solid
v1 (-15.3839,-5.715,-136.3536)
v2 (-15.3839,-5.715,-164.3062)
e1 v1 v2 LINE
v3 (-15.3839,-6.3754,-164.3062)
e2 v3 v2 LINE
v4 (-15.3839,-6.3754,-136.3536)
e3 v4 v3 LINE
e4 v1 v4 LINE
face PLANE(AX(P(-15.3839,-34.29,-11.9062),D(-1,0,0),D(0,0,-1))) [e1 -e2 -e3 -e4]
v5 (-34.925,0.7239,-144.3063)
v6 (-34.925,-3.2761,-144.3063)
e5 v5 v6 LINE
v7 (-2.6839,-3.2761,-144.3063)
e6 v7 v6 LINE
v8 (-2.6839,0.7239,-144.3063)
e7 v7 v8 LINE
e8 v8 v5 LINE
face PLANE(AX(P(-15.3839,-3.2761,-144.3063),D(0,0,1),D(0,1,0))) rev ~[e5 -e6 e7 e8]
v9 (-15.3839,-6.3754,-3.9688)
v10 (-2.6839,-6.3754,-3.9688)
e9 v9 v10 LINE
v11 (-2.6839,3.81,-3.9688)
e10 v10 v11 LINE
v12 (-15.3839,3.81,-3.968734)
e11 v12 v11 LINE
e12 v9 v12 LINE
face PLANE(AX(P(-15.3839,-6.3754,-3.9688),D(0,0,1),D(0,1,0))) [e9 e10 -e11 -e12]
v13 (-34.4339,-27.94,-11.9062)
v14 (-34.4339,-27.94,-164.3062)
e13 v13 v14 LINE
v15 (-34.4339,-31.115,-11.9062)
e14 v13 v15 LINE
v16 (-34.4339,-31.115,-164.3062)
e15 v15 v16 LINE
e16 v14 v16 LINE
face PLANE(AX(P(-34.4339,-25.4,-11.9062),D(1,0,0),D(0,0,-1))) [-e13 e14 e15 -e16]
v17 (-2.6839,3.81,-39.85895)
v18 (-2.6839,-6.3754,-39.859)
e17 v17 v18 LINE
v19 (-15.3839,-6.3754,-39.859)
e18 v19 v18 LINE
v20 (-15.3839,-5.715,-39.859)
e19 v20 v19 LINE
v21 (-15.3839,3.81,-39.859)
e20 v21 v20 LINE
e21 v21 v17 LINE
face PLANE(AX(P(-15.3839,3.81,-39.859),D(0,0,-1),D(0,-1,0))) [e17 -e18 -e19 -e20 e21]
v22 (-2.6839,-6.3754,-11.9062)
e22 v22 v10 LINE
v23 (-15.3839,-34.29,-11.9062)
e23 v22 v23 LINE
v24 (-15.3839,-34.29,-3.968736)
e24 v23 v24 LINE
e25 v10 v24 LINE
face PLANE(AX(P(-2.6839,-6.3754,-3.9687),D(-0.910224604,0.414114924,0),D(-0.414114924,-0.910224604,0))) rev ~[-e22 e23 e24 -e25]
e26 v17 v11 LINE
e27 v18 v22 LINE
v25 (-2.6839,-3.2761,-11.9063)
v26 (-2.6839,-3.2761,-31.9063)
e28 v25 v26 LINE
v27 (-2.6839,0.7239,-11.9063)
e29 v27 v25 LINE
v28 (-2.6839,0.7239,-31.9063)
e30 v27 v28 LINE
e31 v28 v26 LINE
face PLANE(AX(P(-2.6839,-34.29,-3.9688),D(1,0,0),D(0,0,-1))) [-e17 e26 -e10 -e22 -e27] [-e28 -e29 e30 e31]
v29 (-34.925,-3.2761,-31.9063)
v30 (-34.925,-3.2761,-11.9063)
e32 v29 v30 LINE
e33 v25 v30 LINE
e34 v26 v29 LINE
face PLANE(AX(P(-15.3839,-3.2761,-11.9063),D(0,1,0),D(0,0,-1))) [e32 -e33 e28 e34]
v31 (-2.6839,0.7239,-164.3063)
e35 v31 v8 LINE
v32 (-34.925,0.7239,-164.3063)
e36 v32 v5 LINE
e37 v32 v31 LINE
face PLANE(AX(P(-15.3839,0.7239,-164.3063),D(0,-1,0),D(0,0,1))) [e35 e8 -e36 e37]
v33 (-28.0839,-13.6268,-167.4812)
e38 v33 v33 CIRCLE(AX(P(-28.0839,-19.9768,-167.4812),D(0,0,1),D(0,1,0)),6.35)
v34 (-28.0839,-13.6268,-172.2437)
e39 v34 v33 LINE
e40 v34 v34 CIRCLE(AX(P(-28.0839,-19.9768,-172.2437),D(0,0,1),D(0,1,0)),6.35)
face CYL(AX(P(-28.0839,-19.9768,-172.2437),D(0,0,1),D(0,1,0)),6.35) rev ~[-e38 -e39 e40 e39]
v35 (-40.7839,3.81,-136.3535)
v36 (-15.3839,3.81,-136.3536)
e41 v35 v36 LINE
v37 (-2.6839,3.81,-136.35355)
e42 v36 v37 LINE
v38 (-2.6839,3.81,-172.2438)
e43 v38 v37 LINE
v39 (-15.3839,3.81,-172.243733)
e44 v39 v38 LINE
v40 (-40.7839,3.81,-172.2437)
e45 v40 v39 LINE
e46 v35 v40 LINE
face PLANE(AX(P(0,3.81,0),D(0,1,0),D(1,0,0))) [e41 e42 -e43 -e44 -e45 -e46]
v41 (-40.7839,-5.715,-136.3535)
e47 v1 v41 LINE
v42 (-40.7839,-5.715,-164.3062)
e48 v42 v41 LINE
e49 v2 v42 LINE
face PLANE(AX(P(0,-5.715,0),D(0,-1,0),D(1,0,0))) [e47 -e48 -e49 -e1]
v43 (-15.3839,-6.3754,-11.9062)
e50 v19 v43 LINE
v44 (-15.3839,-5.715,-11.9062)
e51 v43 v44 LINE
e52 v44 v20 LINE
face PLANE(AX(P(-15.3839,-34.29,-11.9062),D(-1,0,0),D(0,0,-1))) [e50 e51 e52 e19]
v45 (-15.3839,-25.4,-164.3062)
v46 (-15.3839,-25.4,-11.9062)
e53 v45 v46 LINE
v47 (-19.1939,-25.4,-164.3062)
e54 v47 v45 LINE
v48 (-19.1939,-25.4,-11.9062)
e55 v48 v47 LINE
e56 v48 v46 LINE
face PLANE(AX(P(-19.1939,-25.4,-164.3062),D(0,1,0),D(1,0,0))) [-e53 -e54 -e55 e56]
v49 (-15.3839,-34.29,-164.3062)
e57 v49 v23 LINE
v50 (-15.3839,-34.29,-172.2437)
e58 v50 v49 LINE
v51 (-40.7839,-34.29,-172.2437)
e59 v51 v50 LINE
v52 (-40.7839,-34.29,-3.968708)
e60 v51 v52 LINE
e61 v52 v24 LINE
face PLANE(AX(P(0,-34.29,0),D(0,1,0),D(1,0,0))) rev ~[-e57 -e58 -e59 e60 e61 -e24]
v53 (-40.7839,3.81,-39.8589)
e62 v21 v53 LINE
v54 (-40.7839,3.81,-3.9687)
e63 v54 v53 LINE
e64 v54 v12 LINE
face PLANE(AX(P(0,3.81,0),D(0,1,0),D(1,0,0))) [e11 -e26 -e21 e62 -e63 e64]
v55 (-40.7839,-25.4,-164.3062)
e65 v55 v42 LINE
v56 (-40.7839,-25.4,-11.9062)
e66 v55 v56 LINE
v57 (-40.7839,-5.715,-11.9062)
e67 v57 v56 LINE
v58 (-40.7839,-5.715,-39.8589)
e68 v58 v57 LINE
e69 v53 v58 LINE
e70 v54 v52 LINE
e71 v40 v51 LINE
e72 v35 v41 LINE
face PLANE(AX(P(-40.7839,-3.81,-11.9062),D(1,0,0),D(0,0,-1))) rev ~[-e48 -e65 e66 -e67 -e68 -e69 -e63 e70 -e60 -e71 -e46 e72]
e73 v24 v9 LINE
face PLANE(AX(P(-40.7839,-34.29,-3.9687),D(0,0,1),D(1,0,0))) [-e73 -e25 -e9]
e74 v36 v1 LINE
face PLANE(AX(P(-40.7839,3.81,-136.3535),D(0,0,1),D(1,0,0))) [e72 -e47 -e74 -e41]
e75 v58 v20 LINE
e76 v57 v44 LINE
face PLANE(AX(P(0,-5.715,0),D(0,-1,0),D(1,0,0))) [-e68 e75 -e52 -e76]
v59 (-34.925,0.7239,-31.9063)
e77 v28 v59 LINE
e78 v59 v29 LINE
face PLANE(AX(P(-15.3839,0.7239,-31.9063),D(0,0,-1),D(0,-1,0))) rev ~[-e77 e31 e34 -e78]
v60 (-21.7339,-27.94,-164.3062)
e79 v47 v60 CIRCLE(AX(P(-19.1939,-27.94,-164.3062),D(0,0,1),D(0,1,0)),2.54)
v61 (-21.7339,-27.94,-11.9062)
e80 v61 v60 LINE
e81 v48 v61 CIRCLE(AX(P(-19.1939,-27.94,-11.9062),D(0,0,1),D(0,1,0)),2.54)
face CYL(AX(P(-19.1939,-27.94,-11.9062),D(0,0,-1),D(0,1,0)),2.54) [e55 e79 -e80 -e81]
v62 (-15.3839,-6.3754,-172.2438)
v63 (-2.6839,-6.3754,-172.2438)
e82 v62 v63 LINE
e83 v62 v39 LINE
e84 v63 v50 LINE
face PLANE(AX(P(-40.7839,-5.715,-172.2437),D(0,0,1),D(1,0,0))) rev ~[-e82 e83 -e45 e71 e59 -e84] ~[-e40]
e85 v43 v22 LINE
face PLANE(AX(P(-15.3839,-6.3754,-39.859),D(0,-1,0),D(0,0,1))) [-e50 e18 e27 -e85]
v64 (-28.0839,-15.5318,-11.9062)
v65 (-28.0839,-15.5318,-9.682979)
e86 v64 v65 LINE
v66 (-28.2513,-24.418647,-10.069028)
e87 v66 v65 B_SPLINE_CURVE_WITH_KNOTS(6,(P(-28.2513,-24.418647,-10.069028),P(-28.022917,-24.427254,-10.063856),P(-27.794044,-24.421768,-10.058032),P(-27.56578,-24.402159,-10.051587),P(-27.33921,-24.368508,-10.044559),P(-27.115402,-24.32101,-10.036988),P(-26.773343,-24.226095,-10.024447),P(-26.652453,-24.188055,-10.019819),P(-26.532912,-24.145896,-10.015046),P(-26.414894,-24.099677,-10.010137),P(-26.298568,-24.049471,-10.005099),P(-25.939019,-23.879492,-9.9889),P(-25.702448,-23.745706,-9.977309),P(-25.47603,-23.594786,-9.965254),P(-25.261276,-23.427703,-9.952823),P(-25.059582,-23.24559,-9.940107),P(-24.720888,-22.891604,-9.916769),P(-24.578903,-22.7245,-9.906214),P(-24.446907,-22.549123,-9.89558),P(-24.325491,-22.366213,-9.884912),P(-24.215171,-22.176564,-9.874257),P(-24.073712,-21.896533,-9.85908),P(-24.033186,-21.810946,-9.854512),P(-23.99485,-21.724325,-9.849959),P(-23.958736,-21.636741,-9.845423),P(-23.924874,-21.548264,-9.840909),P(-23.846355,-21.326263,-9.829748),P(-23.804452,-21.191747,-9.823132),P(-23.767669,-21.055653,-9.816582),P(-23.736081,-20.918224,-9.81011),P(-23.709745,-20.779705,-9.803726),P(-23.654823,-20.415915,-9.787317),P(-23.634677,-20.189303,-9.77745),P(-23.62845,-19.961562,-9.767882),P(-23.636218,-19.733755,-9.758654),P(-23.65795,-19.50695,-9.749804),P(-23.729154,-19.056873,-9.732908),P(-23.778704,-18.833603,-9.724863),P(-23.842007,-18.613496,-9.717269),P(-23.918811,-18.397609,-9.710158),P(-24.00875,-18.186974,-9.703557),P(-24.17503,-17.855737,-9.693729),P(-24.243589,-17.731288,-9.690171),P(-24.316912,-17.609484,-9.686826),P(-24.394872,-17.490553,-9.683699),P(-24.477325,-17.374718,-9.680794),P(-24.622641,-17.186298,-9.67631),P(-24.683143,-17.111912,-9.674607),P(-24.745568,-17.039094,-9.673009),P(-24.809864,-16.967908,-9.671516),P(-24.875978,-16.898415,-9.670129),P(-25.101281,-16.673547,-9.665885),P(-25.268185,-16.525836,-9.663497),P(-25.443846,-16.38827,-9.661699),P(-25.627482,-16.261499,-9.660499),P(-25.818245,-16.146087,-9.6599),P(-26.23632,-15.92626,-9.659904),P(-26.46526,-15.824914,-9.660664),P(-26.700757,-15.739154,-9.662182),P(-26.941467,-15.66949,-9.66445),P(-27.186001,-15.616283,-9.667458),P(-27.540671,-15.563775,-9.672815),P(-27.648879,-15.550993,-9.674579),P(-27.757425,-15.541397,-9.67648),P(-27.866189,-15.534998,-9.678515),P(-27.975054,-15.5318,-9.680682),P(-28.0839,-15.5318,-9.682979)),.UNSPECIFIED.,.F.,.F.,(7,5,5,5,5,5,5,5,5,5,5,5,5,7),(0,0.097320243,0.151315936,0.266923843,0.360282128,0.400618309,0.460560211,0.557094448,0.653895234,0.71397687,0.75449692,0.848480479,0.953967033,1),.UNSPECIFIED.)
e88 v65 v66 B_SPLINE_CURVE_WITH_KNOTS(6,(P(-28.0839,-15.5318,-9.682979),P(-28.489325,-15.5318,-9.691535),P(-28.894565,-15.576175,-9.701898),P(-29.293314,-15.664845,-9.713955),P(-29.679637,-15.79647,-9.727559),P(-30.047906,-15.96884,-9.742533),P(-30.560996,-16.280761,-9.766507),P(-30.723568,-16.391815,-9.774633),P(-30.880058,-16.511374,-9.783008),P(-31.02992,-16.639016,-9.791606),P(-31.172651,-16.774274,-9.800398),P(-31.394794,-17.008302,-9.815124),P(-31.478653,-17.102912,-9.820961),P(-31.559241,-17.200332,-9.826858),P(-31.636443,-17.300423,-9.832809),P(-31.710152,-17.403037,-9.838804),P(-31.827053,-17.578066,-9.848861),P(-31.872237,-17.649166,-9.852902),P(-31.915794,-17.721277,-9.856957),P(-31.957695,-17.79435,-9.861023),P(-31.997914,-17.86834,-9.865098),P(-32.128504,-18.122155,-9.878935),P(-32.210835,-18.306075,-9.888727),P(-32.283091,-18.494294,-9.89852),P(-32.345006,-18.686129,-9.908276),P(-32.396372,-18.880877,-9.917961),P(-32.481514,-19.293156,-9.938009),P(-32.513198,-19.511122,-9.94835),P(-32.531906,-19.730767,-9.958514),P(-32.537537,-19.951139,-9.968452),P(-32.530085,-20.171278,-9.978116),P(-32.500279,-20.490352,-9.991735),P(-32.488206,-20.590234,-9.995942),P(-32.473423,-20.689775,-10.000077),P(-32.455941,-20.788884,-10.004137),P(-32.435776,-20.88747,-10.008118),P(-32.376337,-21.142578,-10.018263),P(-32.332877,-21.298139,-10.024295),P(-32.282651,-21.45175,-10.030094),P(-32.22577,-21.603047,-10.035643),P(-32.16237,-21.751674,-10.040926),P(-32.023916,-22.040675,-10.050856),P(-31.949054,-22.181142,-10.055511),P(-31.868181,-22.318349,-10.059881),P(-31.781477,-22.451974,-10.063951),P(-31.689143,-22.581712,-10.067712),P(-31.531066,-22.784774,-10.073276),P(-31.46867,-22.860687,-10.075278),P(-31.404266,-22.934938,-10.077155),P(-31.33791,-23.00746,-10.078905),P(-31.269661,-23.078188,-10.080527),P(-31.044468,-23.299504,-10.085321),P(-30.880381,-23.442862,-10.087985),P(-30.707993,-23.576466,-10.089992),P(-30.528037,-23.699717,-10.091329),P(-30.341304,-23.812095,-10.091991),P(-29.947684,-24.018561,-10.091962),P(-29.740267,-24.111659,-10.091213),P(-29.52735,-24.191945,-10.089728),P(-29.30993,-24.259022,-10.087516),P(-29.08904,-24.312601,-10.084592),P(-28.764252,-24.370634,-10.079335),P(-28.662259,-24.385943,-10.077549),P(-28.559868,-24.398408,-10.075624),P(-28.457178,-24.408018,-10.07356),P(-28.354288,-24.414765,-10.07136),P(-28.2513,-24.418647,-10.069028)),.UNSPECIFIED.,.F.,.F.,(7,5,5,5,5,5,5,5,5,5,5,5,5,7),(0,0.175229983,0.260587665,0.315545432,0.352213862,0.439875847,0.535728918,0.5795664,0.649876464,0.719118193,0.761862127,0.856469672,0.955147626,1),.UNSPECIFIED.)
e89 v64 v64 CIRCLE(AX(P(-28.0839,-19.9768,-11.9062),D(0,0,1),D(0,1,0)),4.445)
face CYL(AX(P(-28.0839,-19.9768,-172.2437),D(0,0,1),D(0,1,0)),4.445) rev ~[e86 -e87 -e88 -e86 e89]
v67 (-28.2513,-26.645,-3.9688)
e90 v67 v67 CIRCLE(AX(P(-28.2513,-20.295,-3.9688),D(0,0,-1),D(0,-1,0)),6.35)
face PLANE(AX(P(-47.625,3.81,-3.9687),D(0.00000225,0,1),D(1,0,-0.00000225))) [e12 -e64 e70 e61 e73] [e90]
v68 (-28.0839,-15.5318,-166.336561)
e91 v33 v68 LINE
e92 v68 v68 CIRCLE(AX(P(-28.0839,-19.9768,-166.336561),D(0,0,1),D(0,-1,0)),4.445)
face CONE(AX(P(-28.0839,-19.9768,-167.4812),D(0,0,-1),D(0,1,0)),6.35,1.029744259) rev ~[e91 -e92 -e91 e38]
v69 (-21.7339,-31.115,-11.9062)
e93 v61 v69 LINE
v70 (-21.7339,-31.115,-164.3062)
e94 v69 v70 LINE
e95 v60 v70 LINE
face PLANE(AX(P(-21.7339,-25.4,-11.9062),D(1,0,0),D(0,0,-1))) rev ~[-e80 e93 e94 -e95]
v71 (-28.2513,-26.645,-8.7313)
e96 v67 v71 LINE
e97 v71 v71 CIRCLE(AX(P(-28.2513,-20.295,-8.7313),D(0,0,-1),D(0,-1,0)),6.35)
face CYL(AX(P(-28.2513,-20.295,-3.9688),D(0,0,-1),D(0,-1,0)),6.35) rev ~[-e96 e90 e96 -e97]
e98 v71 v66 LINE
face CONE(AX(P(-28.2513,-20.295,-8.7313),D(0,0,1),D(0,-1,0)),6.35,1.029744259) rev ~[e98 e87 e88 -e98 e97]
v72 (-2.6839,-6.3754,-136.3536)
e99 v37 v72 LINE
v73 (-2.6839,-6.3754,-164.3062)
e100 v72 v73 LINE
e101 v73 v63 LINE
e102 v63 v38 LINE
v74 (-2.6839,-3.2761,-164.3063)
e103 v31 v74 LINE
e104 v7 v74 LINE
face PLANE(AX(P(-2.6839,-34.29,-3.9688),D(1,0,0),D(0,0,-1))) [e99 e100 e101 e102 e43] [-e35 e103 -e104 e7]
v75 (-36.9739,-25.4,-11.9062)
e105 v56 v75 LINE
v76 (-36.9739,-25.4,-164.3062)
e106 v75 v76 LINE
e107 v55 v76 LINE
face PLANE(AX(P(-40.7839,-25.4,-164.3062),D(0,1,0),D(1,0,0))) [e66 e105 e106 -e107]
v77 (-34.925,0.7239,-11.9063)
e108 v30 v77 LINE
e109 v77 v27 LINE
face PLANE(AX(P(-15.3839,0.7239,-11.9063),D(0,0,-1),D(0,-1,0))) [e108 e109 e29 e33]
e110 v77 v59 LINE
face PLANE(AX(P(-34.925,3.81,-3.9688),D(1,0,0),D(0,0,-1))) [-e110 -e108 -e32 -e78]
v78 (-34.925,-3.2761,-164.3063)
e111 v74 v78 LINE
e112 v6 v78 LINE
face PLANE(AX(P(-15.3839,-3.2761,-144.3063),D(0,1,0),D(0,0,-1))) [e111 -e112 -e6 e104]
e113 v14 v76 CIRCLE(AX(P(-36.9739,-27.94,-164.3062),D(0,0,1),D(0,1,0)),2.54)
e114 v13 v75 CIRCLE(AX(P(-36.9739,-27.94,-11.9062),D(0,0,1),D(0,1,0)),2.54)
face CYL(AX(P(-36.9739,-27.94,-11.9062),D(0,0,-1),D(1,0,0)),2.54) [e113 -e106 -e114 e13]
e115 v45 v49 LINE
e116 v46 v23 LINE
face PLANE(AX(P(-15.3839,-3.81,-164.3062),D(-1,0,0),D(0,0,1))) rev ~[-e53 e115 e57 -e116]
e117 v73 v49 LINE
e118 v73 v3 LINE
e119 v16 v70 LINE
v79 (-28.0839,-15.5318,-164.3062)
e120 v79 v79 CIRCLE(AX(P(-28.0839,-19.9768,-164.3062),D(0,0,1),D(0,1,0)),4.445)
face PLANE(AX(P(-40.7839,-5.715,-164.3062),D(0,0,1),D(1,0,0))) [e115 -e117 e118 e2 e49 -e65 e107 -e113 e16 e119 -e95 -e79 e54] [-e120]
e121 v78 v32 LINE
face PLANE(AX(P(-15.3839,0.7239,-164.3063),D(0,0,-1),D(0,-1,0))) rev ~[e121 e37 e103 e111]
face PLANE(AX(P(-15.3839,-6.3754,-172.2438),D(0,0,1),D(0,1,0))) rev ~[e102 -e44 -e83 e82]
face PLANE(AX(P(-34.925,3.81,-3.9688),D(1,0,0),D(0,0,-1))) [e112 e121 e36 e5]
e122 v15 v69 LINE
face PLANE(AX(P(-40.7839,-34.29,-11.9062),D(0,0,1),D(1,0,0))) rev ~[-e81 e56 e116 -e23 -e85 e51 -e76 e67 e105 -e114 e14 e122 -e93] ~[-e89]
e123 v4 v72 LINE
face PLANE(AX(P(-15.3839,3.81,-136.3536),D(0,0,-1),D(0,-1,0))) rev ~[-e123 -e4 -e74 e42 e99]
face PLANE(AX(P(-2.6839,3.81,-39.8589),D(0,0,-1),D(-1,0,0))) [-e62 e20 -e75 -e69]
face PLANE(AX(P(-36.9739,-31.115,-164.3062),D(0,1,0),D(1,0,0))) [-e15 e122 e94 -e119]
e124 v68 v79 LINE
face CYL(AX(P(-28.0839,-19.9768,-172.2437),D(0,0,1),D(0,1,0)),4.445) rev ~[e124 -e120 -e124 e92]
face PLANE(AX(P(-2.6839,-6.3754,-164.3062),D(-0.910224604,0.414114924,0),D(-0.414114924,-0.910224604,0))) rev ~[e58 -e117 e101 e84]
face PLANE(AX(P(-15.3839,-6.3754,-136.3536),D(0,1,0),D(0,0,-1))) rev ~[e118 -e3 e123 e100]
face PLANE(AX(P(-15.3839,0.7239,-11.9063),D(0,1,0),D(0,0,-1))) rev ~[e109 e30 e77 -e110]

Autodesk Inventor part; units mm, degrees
ref_plane "YZ Plane" through (0, 0, 0) normal (1, 0, 0) x (0, 1, 0)
ref_plane "XZ Plane" through (0, 0, 0) normal (0, 1, 0) x (-1, 0, 0)
ref_plane "XY Plane" through (0, 0, 0) normal (0, 0, 1) x (1, 0, 0)
sketch "Sketch1" plane through (0, 0, 0) normal (0, 1, 0) x (-1, 0, 0)
  line L0 (41.275, -164.3062) -> (9.525, -164.3062)
  line L1 (9.525, -164.3062) -> (9.525, -11.9062)
  line L2 (9.525, -11.9062) -> (41.275, -11.9062)
  line L3 (41.275, -11.9062) -> (41.275, -164.3062)
  line L4 (41.275, -164.3062) -> (9.525, -164.3062)
  line L5 (9.525, -164.3062) -> (9.525, -146.7428)
  line L6 (9.525, -146.7428) -> (41.275, -146.7428)
  line L7 (41.275, -146.7428) -> (41.275, -164.3062)
  point P0 (0, 0)
  dimension "d37" = 31.75
  dimension "d50" = 152.4
sketch "Sketch2" plane through (0, 0, 0) normal (1, 0, 0) x (0, 1, 0)
  point P0 (0, 0)
extrude "Extrusion1" add sketch "Sketch1" along normal mid plane 7.62
sketch "Sketch3" plane through (0, 3.81, 0) normal (0, 1, 0) x (1, 0, 0)
  point P0 (0, 0)
sketch "Sketch4" plane through (0, 3.81, 0) normal (0, 1, 0) x (1, 0, 0)
  line L0 (-47.625, 3.9687) -> (-47.625, 172.2437)
  line L1 (-47.625, 172.2437) -> (-3.175, 172.2437)
  line L2 (-3.175, 172.2437) -> (-3.175, 3.9688)
  line L3 (-41.275, 164.3062) -> (-9.525, 164.3062) projected
  line L4 (-41.275, 11.9062) -> (-41.275, 164.3062) projected
  line L5 (-9.525, 164.3062) -> (-41.275, 164.3062) projected
  line L6 (-41.275, 11.9062) -> (-9.525, 11.9062) projected
  line L7 (-41.275, 164.3062) -> (-9.525, 164.3062)
  line L8 (-9.525, 164.3062) -> (-9.525, 11.9062)
  line L9 (-9.525, 11.9062) -> (-41.275, 11.9062)
  line L10 (-41.275, 11.9062) -> (-41.275, 164.3062)
  line L11 (-47.625, 3.9687) -> (-3.175, 3.9688)
  dimension "d38" = 7.9375
  dimension "d40" = 7.9375
  dimension "d41" = 6.35
  dimension "d42" = 6.35
extrude "Extrusion2" add sketch "Sketch4" against normal blind 38.1
fillet "Fillet1" radius 3.175 3 edges at (-47.625, -34.29, -88.1062) (-47.625, -15.24, -3.9687) (-47.625, -15.24, -172.2437)
sketch "Sketch6" plane through (-3.175, 3.81, -3.9688) normal (1, 0, 0) x (0, 0, -1)
  line L0 (140.3375, -7.0861) -> (160.3375, -7.0861)
  line L1 (160.3375, -7.0861) -> (160.3375, -3.0861)
  line L2 (160.3375, -3.0861) -> (140.3375, -3.0861)
  line L3 (140.3375, -3.0861) -> (140.3375, -7.0861)
  line L4 (27.3343, -7.0861) -> (7.3343, -7.0861)
  line L5 (7.3343, -7.0861) -> (7.3343, -3.0861)
  line L6 (7.3343, -3.0861) -> (27.3343, -3.0861)
  line L7 (27.3343, -3.0861) -> (27.3343, -7.0861)
  line L8 (85.181, -7.0861) -> (65.181, -7.0861)
  line L9 (65.181, -7.0861) -> (65.181, -3.0861)
  line L10 (65.181, -3.0861) -> (85.181, -3.0861)
  line L11 (85.181, -3.0861) -> (85.181, -7.0861)
  line L12 (0, 0) -> (168.275, 0) projected
  point P0 (-3.9688, -3.81)
  point P1 (160.3375, -38.1)
  dimension "d20" = 4
  dimension "d21" = 20
  dimension "d22" = 0
  dimension "d23" = 3.0861
  dimension "d24" = 3.0861
extrude "Extrusion3" cut sketch "Sketch6" against normal blind 31.75 contours L3 L2 L1 L0
sketch "Sketch7" plane through (-3.175, 3.81, -3.9688) normal (1, 0, 0) x (0, 0, -1)
  line L0 (27.9375, -7.0861) -> (7.9375, -7.0861)
  line L1 (7.9375, -7.0861) -> (7.9375, -3.0861)
  line L2 (7.9375, -3.0861) -> (27.9375, -3.0861)
  line L3 (27.9375, -3.0861) -> (27.9375, -7.0861)
  line L4 (160.3375, -7.0861) -> (140.3375, -7.0861) projected
  line L5 (140.3375, -7.0861) -> (140.3375, -3.0861) projected
  line L6 (0, 0) -> (168.275, 0) projected
  line L7 (140.3375, -3.0861) -> (160.3375, -3.0861) projected
  point P0 (-3.9688, -3.81)
  point P1 (7.9375, -38.1)
  dimension "d28" = 0
  dimension "d31" = 3.0861
extrude "Extrusion4" cut sketch "Sketch7" against normal blind 31.75
sketch "Sketch8" plane through (-3.175, 3.81, -3.9688) normal (1, 0, 0) x (0, 0, -1)
  line L0 (94.1324, -7.0861) -> (74.1324, -7.0861)
  line L1 (74.1324, -7.0861) -> (74.1324, -3.0861)
  line L2 (74.1324, -3.0861) -> (94.1324, -3.0861)
  line L3 (94.1324, -3.0861) -> (94.1324, -7.0861)
  line L4 (140.3375, -7.0861) -> (140.3375, -3.0861) projected
  line L5 (140.3375, -3.0861) -> (160.3375, -3.0861) projected
  line L6 (0, 0) -> (168.275, 0) projected
  line L7 (168.275, 0) -> (168.275, -38.1) projected
  line L8 (0, 0) -> (0, -38.1) projected
  point P0 (-3.9688, -3.81)
  point P1 (0, -38.1)
  dimension "d32" = 3.0861
  dimension "d33" = 74.1426
extrude "Extrusion5" cut sketch "Sketch8" against normal blind 31.75
sketch "Sketch10" plane through (-3.175, -34.29, -172.2437) normal (0, 0, -1) x (-1, 0, 0)
  point P0 (-3.175, 34.29)
  point P1 (24.9089, 14.3132)
hole "Hole3" at (-28.0839, -19.9768, -172.2437) direction (0, 0, 1) diameter 8.89 end through all
sketch "Sketch11" plane through (-3.175, -34.29, -172.2437) normal (0, 0, -1) x (-1, 0, 0)
  circle A0 centre (24.9089, 14.3132) radius 4.445 projected
  point P0 (-3.175, 34.29)
hole "Hole4" at (-28.0839, -19.9768, -172.2437) direction (0, 0, 1) diameter 12.7 depth 4.7625 tip angle 118
sketch "Sketch12" plane through (-3.175, -34.29, -3.9688) normal (0, 0, 1) x (1, 0, 0)
  point P0 (3.175, 34.29)
  point P1 (-25.0763, 13.995)
hole "Hole5" at (-28.2513, -20.295, -3.9688) direction (0, 0, -1) diameter 12.7 depth 4.7625 tip angle 118
sketch "Sketch13" plane through (-47.625, 3.81, -169.0687) normal (-1, 0, 0) x (0, 0, 1)
  line L0 (74.93, -14.0718) -> (86.995, -14.0718)
  line L1 (86.995, -14.0718) -> (86.995, -8.3898)
  line L2 (86.995, -8.3898) -> (74.93, -8.3898)
  line L3 (74.93, -8.3898) -> (74.93, -14.0718)
  line L4 (161.925, 0) -> (161.925, -34.925) projected
  line L5 (0, -34.925) -> (0, 0) projected
  point P0 (169.0687, -3.81)
  dimension "d72" = 74.93
  dimension "d73" = 74.93
extrude "Extrusion6" add sketch "Sketch13" along normal blind 12.7
fillet "Fillet2" radius 1.27 1 edges at (-60.325, -10.2618, -88.1062)
fillet "Fillet3" radius 1.27 9 edges at (-60.325, -4.5798, -88.1062) (-59.953, -9.8898, -94.1387) (-60.325, -6.7858, -94.1387) (-53.34, -10.2618, -94.1387) (-53.975, -4.5798, -94.1387) (-59.953, -9.8898, -82.0737) (-60.325, -6.7858, -82.0737) (-53.34, -10.2618, -82.0737) (-53.975, -4.5798, -82.0737)
sketch "Sketch14" plane through (-47.625, -10.2618, -92.8687) normal (0, -1, 0) x (1, 0, 0)
  point P0 (47.625, 92.8687)
  point P1 (-5.4964, 5.0244)
hole "Hole6" at (-53.1214, -10.2618, -87.8444) direction (0, 1, 0) diameter 6.35 end through all
sketch "Sketch15" plane through (0, -34.29, 0) normal (0, -1, 0) x (1, 0, 0)
  line L0 (-3.175, -164.3062) -> (-34.925, -164.3062) projected
  line L1 (-3.175, -172.2437) -> (-3.175, -3.9688) projected
  line L2 (-9.6565, -164.3062) -> (-3.175, -164.3062)
  line L3 (-3.175, -164.3062) -> (-3.175, -12.0649)
  line L4 (-3.175, -12.0649) -> (-9.6565, -12.0649)
  line L5 (-9.6565, -12.0649) -> (-9.6565, -164.3062)
  point P0 (0, 0)
extrude "Extrusion7" cut sketch "Sketch15" against normal blind 21.59
sketch "Sketch16" plane through (0, -34.29, 0) normal (0, -1, 0) x (1, 0, 0)
  line L0 (-41.275, -11.9062) -> (-41.275, -164.3062) projected
  line L1 (-47.625, -169.0687) -> (-47.625, -7.1438) projected
  line L2 (-41.275, -164.3062) -> (-47.625, -164.3062)
  line L3 (-47.625, -164.3062) -> (-47.625, -11.6343)
  line L4 (-47.625, -11.6343) -> (-41.275, -11.6343)
  line L5 (-41.275, -11.6343) -> (-41.275, -164.3062)
  point P0 (0, 0)
extrude "Extrusion8" cut sketch "Sketch16" against normal blind 21.59
fillet "Fillet4" radius 1.27 4 edges at (-3.175, -34.29, -8.0168) (-3.175, -15.24, -3.9688) (-3.175, -34.29, -168.275) (-3.175, -15.24, -172.2437)
sketch "Sketch17" plane through (-44.45, -34.29, -3.9687) normal (0, 0, 1) x (1, 0, 0)
  line L0 (3.6661, -9.4735) -> (29.0661, -9.4735)
  line L1 (29.0661, -9.4735) -> (29.0661, 38.1)
  line L2 (29.0661, 38.1) -> (3.6661, 38.1)
  line L3 (3.6661, 38.1) -> (3.6661, -9.4735)
  circle A0 centre (16.3661, 14.3132) radius 4.445 projected
  line L4 (3.6661, -9.4735) -> (29.0661, 38.1) construction
  line L5 (29.0661, -9.4735) -> (3.6661, 38.1) construction
  line L6 (3.6661, 38.1) -> (-19.5186, 38.1)
  line L7 (-19.5186, 38.1) -> (-19.5186, -9.4735)
  line L8 (-19.5186, -9.4735) -> (3.6661, -9.4735)
  line L9 (3.6661, -9.4735) -> (3.6661, 38.1)
  line L10 (29.0661, 38.1) -> (55.1329, 38.1)
  line L11 (55.1329, 38.1) -> (55.1329, -9.4735)
  line L12 (55.1329, -9.4735) -> (29.0661, -9.4735)
  line L13 (29.0661, -9.4735) -> (29.0661, 38.1)
  point P0 (44.45, 34.29)
  point P1 (29.0661, -9.4735)
  point P2 (3.6661, -9.4735)
  dimension "d90" = 25.4
extrude "Extrusion9" cut sketch "Sketch17" against normal blind 169.8625 contours L8 L7 L6 L3 | L1 L10 L11 L12
sketch "Sketch18" plane through (-15.3839, 3.81, -172.2437) normal (0, 0, -1) x (-1, 0, 0)
  circle A0 centre (12.7, -23.7868) radius 4.445 projected
  circle A1 centre (12.7, -23.7868) radius 21.7714
  point P0 (-15.3839, -3.81)
  dimension "d93" = 43.5429
sketch "Sketch19" plane through (-34.925, -3.2761, -144.3062) normal (0, 0, -1) x (-1, 0, 0)
  point P0 (-34.925, 3.2761)
sketch "Sketch20" plane through (0, -3.81, 0) normal (0, -1, 0) x (1, 0, 0)
  line L0 (-40.7839, -164.3062) -> (-15.3839, -164.3062) projected
  line L1 (-40.7839, -11.9062) -> (-15.3839, -11.9062) projected
  line L2 (-40.7839, -164.3062) -> (-15.3839, -164.3062)
  line L3 (-15.3839, -164.3062) -> (-15.3839, -11.9062)
  line L4 (-15.3839, -11.9062) -> (-40.7839, -11.9062)
  line L5 (-40.7839, -11.9062) -> (-40.7839, -164.3062)
  point P0 (0, 0)
extrude "Extrusion10" add sketch "Sketch20" along normal blind 3
sketch "Sketch21" plane through (0, -6.81, 0) normal (0, -1, 0) x (1, 0, 0)
  line L0 (-40.7839, -164.3062) -> (-40.7839, -172.2437) projected
  line L1 (-40.7839, -164.3062) -> (-34.4339, -164.3062)
  line L2 (-34.4339, -164.3062) -> (-34.4339, -11.9062)
  line L3 (-34.4339, -11.9062) -> (-40.7839, -11.9062)
  line L4 (-40.7839, -11.9062) -> (-40.7839, -164.3062)
  line L5 (-15.3839, -164.3062) -> (-21.7339, -164.3062)
  line L6 (-21.7339, -164.3062) -> (-21.7339, -11.9062)
  line L7 (-21.7339, -11.9062) -> (-15.3839, -11.9062)
  line L8 (-15.3839, -11.9062) -> (-15.3839, -164.3062)
  point P0 (0, 0)
  dimension "d96" = 6.35
  dimension "d97" = 6.35
extrude "Extrusion11" add sketch "Sketch21" along normal blind 8.255
sketch "Sketch22" plane through (-15.3839, -34.29, -3.9688) normal (1, 0, 0) x (0, 0, -1)
  point P0 (-3.9688, 34.29)
sketch "Sketch23" plane through (-15.3839, -34.29, -3.9688) normal (1, 0, 0) x (0, 0, -1)
  line L0 (168.275, 38.1) -> (0, 38.1) projected
  line L1 (0, 38.1) -> (35.8902, 38.1)
  line L2 (35.8902, 38.1) -> (35.8902, 27.9146)
  line L3 (35.8902, 27.9146) -> (0, 27.9146)
  line L4 (0, 27.9146) -> (0, 38.1)
  line L5 (168.275, 38.1) -> (132.3848, 38.1)
  line L6 (132.3848, 38.1) -> (132.3848, 27.9146)
  line L7 (132.3848, 27.9146) -> (168.275, 27.9146)
  line L8 (168.275, 27.9146) -> (168.275, 38.1)
  line L9 (7.9375, 35.0139) -> (7.9375, 31.0139) projected
  line L10 (7.9375, 31.0139) -> (27.9375, 31.0139) projected
  line L11 (7.9375, 35.0139) -> (27.9375, 35.0139)
  line L12 (27.9375, 35.0139) -> (27.9375, 31.0139)
  line L13 (27.9375, 31.0139) -> (7.9375, 31.0139)
  line L14 (7.9375, 31.0139) -> (7.9375, 35.0139)
  line L15 (160.3375, 35.0139) -> (140.3375, 35.0139) projected
  line L16 (140.3375, 31.0139) -> (160.3375, 31.0139) projected
  line L17 (140.3375, 35.0139) -> (160.3375, 35.0139)
  line L18 (160.3375, 35.0139) -> (160.3375, 31.0139)
  line L19 (160.3375, 31.0139) -> (140.3375, 31.0139)
  line L20 (140.3375, 31.0139) -> (140.3375, 35.0139)
  point P0 (-3.9688, 34.29)
  dimension "d100" = 35.8902
  dimension "d101" = 10.1854
  dimension "d102" = 35.8902
  dimension "d103" = 10.1854
extrude "Extrusion12" add sketch "Sketch23" along normal blind 12.7
sketch "Sketch24" plane through (0, -34.29, 0) normal (0, -1, 0) x (1, 0, 0)
  line L0 (-15.3839, -164.3062) -> (-21.7339, -164.3062) projected
  line L1 (-40.7839, -172.2437) -> (-40.7839, -3.9687) projected
  line L2 (-15.3839, -164.3062) -> (-40.7839, -164.3062)
  line L3 (-40.7839, -164.3062) -> (-40.7839, -11.9062)
  line L4 (-40.7839, -11.9062) -> (-15.3839, -11.9062)
  line L5 (-15.3839, -11.9062) -> (-15.3839, -164.3062)
  point P0 (0, 0)
extrude "Extrusion13" cut sketch "Sketch24" against normal blind 28.575
sketch "Sketch25" plane through (-40.7839, -34.29, -164.3062) normal (0, 0, 1) x (1, 0, 0)
  line L0 (25.4, 0) -> (25.4, 27.9146) projected
  line L1 (0, 0) -> (0, 38.1) projected
  line L2 (25.4, 0) -> (0, 0)
  line L3 (0, 0) -> (0, 3.175)
  line L4 (0, 3.175) -> (25.4, 3.175)
  line L5 (25.4, 3.175) -> (25.4, 0)
  line L6 (25.4, 0) -> (21.59, 0)
  line L7 (21.59, 0) -> (21.59, 8.89)
  line L8 (21.59, 8.89) -> (25.4, 8.89)
  line L9 (25.4, 8.89) -> (25.4, 0)
  line L10 (0, 0) -> (3.81, 0)
  line L11 (3.81, 0) -> (3.81, 8.89)
  line L12 (3.81, 8.89) -> (0, 8.89)
  line L13 (0, 8.89) -> (0, 0)
  point P0 (40.7839, 34.29)
  point P1 (25.4, 8.89)
  point P2 (21.59, 3.175)
  point P3 (3.81, 3.175)
  point P4 (0, 8.89)
  dimension "d108" = 3.175
  dimension "d109" = 3.81
  dimension "d110" = 8.89
  dimension "d111" = 3.81
  dimension "d112" = 8.89
extrude "Extrusion14" add sketch "Sketch25" along normal blind 152.4
sketch "Sketch26" plane through (0, 3.81, 0) normal (0, 1, 0) x (1, 0, 0)
  line L0 (-2.6839, 3.9687) -> (-2.6839, 39.8589) projected
  line L1 (-40.7839, 164.3062) -> (-40.7839, 11.9062) projected
  line L2 (-2.6839, 39.8589) -> (-40.7839, 39.8589)
  line L3 (-40.7839, 39.8589) -> (-40.7839, 136.3535)
  line L4 (-40.7839, 136.3535) -> (-2.6839, 136.3535)
  line L5 (-2.6839, 136.3535) -> (-2.6839, 39.8589)
  point P0 (0, 0)
  dimension "d115" = 96.4946
extrude "Extrusion15" cut sketch "Sketch26" against normal blind 11.1125
sketch "Sketch27" plane through (-40.7839, -34.29, -3.9687) normal (-1, 0, 0) x (0, 0, 1)
  point P0 (3.9688, 34.29)
sketch "Sketch28" plane through (-40.7839, -34.29, -3.9687) normal (0, 0, 1) x (1, 0, 0)
  line L0 (25.4, 27.9146) -> (38.1, 27.9146) projected
  line L1 (25.4, 27.9146) -> (25.4, 0) projected
  line L2 (38.1, 27.9146) -> (25.4, 0)
  line L3 (25.4, 27.9146) -> (25.4, 28.575) projected
  line L4 (25.4, 0) -> (25.4, 27.9146)
  line L5 (38.1, 38.1) -> (38.1, 27.9146) projected
  line L6 (25.4, 27.9146) -> (38.1, 27.9146)
  point P0 (40.7839, 34.29)
extrude "Extrusion16" add sketch "Sketch28" against normal blind 7.9375
sketch "Sketch29" plane through (-40.7839, -5.715, -164.3062) normal (0, 0, 1) x (1, 0, 0)
  line L0 (25.4, -28.575) -> (0, -28.575) projected
  line L1 (25.4, -0.6604) -> (25.4, -28.575) projected
  line L2 (25.4, -28.575) -> (25.4, -0.6604)
  line L3 (38.1, -0.6604) -> (25.4, -0.6604) projected
  line L4 (25.4, -0.6604) -> (38.1, -0.6604)
  line L5 (38.1, -0.6604) -> (25.4, -28.575) projected
  line L6 (38.1, -0.6604) -> (25.4, -28.575)
  point P0 (40.7839, 5.715)
extrude "Extrusion17" add sketch "Sketch29" against normal blind 7.9375
sketch "Sketch30" plane through (-40.7839, -25.4, -164.3062) normal (0, 1, 0) x (1, 0, 0)
  line L0 (3.81, 0) -> (3.81, -152.4) projected
  line L1 (25.4, 0) -> (0, 0) projected
  line L2 (3.81, -152.4) -> (6.35, -152.4)
  line L3 (6.35, -152.4) -> (6.35, 0)
  line L4 (6.35, 0) -> (3.81, 0)
  line L5 (3.81, 0) -> (3.81, -152.4)
  line L6 (21.59, 0) -> (21.59, -152.4) projected
  line L7 (21.59, -152.4) -> (19.05, -152.4)
  line L8 (19.05, -152.4) -> (19.05, 0)
  line L9 (19.05, 0) -> (21.59, 0)
  line L10 (21.59, 0) -> (21.59, -152.4)
  point P0 (40.7839, -164.3062)
  dimension "d122" = 2.54
  dimension "d123" = 2.54
extrude "Extrusion18" add sketch "Sketch30" against normal blind 7.9375
fillet "Fillet5" radius 2.54 2 edges at (-34.4339, -25.4, -88.1062) (-21.7339, -25.4, -88.1062)
sketch "Sketch31" plane through (-40.7839, -25.4, -11.9062) normal (0, 1, 0) x (1, 0, 0)
  circle A0 centre (-3.2262, 76.2) radius 2.921
  line L0 (-6.4525, 80.645) -> (-6.4525, 71.755)
  line L1 (-6.4525, 71.755) -> (0, 71.755)
  line L2 (0, 71.755) -> (0, 80.645)
  line L3 (0, 80.645) -> (-6.4525, 80.645)
  line L4 (-6.4525, 80.645) -> (0, 71.755) construction
  line L5 (-6.4525, 71.755) -> (0, 80.645) construction
  point P0 (40.7839, -11.9062)
  dimension "d127" = 5.842
  dimension "d128" = 8.89
extrude "Extrusion19" add sketch "Sketch31" against normal blind 4.7625
sketch "Sketch32" plane through (-40.7839, -34.29, -172.2437) normal (0, 0, -1) x (-1, 0, 0)
  point P0 (-40.7839, 34.29)
sketch "Sketch33" plane through (0, -34.29, 0) normal (0, -1, 0) x (1, 0, 0)
  line L0 (-40.7839, -3.9687) -> (-40.7839, -172.2437) projected
  line L1 (-55.97, -106.4068) -> (-40.7839, -106.4068)
  line L2 (-40.7839, -106.4068) -> (-40.7839, -77.2514)
  line L3 (-40.7839, -77.2514) -> (-55.97, -77.2514)
  line L4 (-55.97, -77.2514) -> (-55.97, -106.4068)
  point P0 (0, 0)
extrude "Extrusion20" cut sketch "Sketch33" against normal blind 25.4
properties part number "_3DPrint"
